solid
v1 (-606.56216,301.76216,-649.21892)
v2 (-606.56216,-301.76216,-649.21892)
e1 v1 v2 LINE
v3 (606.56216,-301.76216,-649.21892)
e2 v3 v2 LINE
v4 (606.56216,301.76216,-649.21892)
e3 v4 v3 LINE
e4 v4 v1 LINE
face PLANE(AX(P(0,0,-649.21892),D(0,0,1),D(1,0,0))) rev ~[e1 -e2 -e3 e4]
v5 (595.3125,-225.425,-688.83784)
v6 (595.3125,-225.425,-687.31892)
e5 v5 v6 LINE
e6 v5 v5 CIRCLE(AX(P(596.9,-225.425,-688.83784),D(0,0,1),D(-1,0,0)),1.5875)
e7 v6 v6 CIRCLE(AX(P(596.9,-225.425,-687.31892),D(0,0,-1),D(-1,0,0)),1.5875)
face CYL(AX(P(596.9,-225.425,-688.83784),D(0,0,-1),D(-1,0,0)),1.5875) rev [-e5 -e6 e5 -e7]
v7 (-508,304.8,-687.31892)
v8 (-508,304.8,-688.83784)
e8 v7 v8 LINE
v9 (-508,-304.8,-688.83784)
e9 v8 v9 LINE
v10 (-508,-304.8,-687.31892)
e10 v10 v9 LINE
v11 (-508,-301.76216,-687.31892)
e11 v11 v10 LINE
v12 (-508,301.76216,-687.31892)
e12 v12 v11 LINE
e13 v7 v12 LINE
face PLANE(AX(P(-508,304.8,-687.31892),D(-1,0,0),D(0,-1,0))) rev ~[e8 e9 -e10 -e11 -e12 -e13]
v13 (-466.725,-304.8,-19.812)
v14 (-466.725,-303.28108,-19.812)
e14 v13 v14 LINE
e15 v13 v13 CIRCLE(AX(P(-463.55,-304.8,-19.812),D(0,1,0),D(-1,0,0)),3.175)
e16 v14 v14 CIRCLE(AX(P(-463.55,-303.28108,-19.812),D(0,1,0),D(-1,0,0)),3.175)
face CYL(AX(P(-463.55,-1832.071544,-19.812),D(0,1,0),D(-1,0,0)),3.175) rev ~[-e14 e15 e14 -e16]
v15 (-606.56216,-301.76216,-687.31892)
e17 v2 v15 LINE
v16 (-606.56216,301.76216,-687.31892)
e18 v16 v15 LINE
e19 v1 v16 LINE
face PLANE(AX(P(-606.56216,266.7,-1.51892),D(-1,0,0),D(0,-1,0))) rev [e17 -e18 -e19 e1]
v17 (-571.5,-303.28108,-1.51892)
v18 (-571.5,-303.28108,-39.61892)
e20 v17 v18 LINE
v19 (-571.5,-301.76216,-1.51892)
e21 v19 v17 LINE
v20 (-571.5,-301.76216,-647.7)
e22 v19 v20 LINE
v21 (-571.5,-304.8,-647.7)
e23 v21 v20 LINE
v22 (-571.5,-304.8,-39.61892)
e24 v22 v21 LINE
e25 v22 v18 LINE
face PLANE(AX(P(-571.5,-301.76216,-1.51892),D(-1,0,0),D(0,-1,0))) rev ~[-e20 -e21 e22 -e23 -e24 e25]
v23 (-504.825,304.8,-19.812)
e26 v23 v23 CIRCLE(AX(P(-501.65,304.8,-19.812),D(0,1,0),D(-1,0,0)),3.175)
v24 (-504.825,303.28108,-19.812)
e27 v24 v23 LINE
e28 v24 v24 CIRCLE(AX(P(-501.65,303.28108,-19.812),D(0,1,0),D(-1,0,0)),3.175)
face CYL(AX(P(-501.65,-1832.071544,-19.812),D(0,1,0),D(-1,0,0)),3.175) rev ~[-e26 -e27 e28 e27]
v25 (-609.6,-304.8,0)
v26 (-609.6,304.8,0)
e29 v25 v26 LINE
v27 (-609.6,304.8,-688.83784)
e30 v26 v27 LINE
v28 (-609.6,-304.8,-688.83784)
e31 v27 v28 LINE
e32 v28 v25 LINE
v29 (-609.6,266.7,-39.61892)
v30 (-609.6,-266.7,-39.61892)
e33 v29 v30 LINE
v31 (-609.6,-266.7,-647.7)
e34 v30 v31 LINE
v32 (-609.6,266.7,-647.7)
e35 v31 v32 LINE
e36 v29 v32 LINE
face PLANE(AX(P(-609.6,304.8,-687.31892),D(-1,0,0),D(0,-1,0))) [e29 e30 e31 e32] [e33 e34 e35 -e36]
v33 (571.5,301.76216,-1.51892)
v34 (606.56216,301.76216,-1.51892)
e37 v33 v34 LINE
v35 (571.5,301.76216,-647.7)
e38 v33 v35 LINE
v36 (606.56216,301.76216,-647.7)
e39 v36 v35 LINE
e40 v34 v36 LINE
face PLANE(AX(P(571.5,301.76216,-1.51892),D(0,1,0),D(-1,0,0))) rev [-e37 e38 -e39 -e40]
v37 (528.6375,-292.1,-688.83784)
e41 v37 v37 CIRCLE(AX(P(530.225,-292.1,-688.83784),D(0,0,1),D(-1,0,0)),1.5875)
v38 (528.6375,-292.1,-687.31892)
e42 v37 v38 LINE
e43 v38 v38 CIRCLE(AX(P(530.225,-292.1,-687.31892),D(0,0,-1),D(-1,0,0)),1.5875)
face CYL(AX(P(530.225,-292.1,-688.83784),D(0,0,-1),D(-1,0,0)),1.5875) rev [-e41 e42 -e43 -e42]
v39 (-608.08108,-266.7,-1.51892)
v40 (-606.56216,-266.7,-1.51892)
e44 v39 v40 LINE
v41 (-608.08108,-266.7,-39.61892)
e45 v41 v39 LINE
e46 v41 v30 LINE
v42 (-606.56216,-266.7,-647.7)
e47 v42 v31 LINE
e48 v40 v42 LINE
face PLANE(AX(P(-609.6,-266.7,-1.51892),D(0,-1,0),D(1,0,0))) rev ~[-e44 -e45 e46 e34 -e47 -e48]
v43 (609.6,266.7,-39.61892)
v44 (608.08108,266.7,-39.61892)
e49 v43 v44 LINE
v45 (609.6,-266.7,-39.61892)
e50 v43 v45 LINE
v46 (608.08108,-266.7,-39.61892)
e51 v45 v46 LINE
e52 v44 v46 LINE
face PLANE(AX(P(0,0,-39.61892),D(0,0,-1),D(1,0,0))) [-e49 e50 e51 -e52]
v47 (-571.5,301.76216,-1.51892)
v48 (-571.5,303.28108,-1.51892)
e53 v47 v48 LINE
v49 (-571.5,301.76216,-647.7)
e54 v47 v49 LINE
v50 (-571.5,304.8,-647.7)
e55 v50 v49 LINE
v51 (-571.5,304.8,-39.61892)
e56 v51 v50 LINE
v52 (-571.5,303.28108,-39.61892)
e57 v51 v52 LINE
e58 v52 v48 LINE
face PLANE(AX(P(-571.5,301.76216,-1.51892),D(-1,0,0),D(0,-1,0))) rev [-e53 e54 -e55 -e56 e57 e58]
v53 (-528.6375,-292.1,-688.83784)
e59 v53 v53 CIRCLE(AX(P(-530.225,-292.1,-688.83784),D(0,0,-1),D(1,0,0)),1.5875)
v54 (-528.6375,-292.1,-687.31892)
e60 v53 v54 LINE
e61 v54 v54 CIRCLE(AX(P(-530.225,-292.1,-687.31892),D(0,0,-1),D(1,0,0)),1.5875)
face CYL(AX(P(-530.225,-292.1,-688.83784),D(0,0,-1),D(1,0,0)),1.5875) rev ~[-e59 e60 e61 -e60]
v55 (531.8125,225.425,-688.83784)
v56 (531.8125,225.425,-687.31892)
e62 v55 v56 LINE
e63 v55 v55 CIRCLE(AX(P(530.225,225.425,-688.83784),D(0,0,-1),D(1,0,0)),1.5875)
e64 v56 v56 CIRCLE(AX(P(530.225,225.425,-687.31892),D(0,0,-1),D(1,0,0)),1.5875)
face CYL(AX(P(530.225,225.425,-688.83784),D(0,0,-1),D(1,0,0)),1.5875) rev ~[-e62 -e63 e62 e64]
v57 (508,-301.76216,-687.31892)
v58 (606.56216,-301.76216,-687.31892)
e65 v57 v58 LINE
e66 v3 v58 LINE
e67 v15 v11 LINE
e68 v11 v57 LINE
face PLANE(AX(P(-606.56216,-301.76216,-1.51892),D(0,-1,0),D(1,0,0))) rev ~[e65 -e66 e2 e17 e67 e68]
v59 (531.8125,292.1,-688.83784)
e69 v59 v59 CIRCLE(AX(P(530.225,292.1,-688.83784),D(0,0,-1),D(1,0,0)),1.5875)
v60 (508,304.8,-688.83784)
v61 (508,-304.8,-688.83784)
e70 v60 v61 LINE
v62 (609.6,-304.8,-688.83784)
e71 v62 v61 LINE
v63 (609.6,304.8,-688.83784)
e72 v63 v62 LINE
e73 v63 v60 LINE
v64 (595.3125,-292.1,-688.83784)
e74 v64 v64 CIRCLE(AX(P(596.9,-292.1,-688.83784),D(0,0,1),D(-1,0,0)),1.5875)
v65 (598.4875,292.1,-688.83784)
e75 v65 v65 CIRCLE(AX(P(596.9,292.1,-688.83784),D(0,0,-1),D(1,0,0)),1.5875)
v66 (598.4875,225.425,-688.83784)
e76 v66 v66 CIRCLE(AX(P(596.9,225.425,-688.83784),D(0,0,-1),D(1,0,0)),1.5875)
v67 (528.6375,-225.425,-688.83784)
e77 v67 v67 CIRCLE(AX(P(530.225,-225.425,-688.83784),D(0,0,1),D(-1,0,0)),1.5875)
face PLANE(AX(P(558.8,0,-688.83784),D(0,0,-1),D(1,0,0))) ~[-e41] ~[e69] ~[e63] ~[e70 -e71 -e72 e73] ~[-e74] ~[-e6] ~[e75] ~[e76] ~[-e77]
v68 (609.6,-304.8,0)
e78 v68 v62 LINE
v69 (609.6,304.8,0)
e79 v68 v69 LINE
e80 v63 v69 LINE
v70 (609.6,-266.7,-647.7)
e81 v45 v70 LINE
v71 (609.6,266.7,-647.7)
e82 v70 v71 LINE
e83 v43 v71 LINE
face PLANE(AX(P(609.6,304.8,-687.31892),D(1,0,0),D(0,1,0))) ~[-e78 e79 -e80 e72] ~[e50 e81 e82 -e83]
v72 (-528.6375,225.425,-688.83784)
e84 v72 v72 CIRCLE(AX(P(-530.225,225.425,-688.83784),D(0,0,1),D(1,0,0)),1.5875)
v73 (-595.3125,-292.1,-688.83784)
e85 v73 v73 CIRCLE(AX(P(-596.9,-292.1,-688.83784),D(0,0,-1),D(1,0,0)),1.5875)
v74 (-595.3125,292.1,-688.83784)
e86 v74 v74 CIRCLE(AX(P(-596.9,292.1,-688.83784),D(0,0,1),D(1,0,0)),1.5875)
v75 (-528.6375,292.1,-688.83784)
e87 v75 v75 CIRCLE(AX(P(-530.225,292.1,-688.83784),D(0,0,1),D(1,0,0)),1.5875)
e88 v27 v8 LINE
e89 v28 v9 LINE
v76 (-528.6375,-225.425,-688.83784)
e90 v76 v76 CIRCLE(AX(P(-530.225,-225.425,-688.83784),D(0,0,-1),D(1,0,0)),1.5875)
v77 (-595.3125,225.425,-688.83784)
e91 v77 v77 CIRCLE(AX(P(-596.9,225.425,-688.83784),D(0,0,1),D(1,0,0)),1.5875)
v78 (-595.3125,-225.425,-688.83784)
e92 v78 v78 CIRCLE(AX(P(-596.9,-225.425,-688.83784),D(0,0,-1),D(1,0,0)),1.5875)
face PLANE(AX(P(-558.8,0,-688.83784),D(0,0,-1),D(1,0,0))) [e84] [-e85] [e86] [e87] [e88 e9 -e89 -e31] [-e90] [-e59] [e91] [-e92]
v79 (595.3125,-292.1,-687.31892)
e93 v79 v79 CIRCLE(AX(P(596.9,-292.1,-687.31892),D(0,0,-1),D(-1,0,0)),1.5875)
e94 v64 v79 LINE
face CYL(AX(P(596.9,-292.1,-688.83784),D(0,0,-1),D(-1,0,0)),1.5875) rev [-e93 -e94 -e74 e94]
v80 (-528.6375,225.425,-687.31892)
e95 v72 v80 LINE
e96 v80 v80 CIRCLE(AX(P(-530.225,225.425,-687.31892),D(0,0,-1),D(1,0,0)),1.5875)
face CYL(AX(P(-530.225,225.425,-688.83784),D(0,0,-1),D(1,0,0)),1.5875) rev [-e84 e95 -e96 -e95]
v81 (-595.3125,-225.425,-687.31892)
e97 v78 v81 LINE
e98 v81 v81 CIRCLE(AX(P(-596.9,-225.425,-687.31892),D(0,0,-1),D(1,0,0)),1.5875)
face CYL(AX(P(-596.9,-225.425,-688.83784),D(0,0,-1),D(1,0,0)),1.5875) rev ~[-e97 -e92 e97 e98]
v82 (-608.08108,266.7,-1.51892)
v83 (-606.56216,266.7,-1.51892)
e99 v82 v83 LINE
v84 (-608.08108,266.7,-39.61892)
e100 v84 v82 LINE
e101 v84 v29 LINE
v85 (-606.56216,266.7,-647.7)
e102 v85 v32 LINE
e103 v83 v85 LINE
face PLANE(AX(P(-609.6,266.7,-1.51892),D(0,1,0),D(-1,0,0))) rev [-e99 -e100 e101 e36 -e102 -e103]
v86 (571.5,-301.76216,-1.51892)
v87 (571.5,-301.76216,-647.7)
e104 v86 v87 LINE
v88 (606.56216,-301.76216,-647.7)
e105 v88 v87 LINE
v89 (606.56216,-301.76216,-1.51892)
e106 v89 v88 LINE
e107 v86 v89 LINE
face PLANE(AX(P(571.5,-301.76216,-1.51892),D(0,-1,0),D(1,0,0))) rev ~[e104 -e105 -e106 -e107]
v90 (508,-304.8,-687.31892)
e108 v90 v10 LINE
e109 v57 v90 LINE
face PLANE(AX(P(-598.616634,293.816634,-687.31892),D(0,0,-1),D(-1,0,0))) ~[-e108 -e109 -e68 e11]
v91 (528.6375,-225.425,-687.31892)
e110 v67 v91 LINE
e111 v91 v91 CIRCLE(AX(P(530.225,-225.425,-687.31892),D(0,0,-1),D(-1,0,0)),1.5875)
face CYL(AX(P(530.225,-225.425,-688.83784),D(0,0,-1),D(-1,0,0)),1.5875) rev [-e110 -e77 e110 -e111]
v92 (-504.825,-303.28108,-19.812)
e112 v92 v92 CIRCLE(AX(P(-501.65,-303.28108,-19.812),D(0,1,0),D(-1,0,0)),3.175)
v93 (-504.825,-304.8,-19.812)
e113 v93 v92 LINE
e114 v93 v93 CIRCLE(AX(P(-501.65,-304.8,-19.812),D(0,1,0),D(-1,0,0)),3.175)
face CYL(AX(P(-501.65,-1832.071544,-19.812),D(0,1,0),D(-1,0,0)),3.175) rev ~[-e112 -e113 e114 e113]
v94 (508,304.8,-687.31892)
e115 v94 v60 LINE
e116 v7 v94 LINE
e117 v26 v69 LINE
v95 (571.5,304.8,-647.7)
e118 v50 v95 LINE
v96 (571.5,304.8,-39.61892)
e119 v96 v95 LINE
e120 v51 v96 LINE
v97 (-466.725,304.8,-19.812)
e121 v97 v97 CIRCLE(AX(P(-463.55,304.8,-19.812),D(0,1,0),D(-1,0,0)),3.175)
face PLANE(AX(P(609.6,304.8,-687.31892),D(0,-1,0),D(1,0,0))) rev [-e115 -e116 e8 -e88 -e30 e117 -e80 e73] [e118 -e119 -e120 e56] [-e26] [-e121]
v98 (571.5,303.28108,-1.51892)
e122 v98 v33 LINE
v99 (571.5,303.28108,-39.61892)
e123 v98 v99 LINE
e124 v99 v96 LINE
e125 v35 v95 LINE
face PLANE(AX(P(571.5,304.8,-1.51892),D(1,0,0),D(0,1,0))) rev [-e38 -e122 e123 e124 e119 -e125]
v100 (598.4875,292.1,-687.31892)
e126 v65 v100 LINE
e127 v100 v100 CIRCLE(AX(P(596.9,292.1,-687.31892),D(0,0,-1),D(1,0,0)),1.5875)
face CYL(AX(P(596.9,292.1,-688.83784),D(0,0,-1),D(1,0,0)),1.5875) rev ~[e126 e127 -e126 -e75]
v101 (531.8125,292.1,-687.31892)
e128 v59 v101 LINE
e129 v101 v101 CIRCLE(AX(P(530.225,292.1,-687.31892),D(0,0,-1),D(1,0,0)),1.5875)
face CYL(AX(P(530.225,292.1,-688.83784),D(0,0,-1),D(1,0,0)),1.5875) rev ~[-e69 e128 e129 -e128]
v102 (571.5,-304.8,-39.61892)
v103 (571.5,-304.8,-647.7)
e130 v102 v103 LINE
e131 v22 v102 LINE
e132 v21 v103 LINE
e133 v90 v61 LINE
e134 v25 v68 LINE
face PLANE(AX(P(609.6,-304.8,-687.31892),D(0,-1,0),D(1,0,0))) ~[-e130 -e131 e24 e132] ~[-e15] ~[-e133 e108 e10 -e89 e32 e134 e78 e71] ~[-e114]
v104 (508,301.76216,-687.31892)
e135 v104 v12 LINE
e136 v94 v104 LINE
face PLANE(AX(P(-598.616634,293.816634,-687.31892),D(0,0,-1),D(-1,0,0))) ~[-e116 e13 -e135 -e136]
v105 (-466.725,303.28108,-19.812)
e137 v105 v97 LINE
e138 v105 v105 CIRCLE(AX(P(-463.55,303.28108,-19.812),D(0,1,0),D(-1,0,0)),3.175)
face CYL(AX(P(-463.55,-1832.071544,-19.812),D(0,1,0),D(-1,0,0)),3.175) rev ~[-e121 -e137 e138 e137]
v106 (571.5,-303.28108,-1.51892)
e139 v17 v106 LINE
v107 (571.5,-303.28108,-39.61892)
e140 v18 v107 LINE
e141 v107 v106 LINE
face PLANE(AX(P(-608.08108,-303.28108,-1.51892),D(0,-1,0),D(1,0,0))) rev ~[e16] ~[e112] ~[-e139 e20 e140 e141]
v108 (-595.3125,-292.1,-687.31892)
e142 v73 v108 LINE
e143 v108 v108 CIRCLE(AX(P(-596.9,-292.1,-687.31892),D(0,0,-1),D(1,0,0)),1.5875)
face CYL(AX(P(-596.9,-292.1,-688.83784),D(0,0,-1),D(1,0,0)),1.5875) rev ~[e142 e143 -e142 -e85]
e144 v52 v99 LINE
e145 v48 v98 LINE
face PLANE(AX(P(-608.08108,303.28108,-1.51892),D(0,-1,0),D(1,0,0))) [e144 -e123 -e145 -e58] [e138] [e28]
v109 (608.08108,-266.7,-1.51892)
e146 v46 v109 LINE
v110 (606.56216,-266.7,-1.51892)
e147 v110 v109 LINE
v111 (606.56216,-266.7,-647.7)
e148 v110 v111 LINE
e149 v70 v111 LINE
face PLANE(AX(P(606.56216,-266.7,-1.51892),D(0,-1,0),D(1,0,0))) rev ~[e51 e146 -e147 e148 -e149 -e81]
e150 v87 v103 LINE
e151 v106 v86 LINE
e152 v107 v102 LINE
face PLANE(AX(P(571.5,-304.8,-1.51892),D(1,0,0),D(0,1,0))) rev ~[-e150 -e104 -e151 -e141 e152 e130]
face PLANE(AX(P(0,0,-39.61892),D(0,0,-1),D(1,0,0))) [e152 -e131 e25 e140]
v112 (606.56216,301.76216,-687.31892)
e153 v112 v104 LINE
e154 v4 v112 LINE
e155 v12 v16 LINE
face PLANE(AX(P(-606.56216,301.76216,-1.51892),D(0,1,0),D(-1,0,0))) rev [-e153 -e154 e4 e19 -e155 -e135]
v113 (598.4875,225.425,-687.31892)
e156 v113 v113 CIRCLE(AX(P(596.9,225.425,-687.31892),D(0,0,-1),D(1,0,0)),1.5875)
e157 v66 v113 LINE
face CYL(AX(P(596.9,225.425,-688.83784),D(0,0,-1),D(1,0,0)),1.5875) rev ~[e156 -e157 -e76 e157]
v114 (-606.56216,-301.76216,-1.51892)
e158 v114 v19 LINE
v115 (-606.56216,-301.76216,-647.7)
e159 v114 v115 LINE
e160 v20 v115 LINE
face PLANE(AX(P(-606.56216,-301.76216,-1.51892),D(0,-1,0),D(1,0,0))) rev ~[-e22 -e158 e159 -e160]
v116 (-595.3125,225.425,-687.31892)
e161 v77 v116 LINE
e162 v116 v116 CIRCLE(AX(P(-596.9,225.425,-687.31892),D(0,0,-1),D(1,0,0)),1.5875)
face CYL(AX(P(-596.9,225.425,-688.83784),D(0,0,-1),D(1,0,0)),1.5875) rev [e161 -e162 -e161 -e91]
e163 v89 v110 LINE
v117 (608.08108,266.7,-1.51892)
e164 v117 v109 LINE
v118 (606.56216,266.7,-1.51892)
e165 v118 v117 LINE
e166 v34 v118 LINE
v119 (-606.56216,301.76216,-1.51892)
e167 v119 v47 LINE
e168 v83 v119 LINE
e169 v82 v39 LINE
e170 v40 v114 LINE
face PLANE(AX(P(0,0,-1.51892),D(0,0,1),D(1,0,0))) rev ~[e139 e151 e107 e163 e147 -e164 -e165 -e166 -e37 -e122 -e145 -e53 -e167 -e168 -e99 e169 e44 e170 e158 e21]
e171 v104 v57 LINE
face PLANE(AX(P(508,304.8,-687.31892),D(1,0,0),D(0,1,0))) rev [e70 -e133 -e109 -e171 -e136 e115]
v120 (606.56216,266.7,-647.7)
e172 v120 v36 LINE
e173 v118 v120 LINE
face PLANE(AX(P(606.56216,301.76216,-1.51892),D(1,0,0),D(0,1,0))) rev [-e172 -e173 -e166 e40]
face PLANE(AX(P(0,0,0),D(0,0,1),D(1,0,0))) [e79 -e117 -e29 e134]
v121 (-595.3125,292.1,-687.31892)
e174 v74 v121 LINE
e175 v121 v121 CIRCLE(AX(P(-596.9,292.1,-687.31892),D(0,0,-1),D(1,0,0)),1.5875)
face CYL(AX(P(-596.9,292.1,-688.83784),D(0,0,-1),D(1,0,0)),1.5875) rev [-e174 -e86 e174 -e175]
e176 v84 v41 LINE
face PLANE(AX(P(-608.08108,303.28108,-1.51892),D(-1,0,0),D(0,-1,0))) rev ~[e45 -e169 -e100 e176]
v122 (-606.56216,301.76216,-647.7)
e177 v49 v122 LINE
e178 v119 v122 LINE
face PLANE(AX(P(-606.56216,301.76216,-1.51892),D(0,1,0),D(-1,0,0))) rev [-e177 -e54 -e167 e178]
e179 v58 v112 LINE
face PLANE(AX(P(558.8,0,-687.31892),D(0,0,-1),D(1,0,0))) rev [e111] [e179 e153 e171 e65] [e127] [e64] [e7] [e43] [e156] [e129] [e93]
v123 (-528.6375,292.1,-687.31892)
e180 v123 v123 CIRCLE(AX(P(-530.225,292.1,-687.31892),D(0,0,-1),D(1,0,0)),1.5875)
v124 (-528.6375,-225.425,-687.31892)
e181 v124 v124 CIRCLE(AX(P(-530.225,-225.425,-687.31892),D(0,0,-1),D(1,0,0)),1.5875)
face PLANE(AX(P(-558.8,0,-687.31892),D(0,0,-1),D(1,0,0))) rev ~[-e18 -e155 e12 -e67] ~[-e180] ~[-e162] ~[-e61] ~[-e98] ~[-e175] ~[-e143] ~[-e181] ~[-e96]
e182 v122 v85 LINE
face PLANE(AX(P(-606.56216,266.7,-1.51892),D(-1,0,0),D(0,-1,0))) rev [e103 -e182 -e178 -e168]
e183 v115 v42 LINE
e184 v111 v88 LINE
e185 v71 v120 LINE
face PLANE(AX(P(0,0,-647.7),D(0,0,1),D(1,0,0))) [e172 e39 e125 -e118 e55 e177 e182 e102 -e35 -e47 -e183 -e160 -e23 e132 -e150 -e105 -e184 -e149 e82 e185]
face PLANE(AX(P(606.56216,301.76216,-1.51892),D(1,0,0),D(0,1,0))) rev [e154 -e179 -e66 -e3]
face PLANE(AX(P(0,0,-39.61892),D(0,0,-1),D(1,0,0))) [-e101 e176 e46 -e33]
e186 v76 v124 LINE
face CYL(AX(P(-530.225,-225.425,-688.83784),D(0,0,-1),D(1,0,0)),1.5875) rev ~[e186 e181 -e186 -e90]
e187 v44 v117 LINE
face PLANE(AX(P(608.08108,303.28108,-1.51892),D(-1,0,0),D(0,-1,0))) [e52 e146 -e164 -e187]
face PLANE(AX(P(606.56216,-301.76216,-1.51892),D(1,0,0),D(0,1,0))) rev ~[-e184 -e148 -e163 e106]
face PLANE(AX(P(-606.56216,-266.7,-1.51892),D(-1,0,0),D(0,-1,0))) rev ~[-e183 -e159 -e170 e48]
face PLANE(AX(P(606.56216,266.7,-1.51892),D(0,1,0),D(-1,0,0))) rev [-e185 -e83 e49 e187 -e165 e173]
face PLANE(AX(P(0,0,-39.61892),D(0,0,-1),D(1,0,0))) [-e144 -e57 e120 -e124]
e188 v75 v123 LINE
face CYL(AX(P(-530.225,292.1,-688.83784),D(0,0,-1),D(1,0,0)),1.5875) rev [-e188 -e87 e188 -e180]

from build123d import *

# Parameters (mm, degrees)
F0_W              = 1219.2
F0_H              = 609.6
F1_DEPTH          = 1.51892
F2_W              = 1219.2
F2_H              = 609.6
F2_W_2            = 1216.16216
F2_H_2            = 606.56216
F3_DEPTH          = 38.1
F5_DEPTH          = 685.8
F7_W              = 1219.2
F7_H              = 609.6
F8_DEPTH          = 1.51892
F9_W              = 1219.2
F9_H              = 609.6
F9_W_2            = 1213.12432
F9_H_2            = 603.52432
F10_DEPTH         = 38.1
F11_W             = 101.6
F11_H             = 609.6
F12_DEPTH         = 1.51892
F13_R             = 1.5875
F14_DEPTH         = 1.651
F14_COPIES2_COUNT = 2
F14_COPIES2_PITCH = 1240.259203
F16_D             = 6.35


# Not quite as in the source:
# - a pattern or mirror of a feature is missing from the dataset's text; its kind, count and spacing are read off the source's solid


with BuildPart() as f1:
    # F0 (on Top) → F1 (new body)
    with BuildSketch(Plane.XY):
        Rectangle(F0_W, F0_H)
    extrude(amount=-F1_DEPTH)

    # F2 (on face) → F3 (join)
    with BuildSketch(Plane(origin=(0, 0, -1.51892), x_dir=(1, 0, 0), z_dir=(0, 0, -1))):
        Rectangle(F2_W, F2_H)
        Rectangle(F2_W_2, F2_H_2, mode=Mode.SUBTRACT)
    extrude(amount=F3_DEPTH)

    # F4 (on face) → F5 (join)
    with BuildSketch(Plane(origin=(0, 0, -1.51892), x_dir=(1, 0, 0), z_dir=(0, 0, -1))):
        Polygon((-571.5, 301.76216), (-571.5, 304.8), (-609.6, 304.8), (-609.6, 266.7), (-606.56216, 266.7), (-606.56216, 301.76216), align=None)
        Polygon((571.5, 304.8), (571.5, 301.76216), (606.56216, 301.76216), (606.56216, 266.7), (609.6, 266.7), (609.6, 304.8), align=None)
    f5 = extrude(amount=F5_DEPTH)

    # F5_copies: F5 across plane
    add(f5.mirror(Plane.ZX))

    # F7 (on offset) → F8 (join)
    with BuildSketch(Plane.XY.offset(-647.7)):
        Rectangle(F7_W, F7_H)
    extrude(amount=-F8_DEPTH)

    # F9 (on face) → F10 (join)
    with BuildSketch(Plane(origin=(0, 0, -649.21892), x_dir=(1, 0, 0), z_dir=(0, 0, -1))):
        Rectangle(F9_W, F9_H)
        Rectangle(F9_W_2, F9_H_2, mode=Mode.SUBTRACT)
    extrude(amount=F10_DEPTH)

    # F11 (on face) → F12 (join)
    with BuildSketch(Plane(origin=(0, 0, -687.31892), x_dir=(1, 0, 0), z_dir=(0, 0, -1))):
        with Locations((-558.8, 0)):
            Rectangle(F11_W, F11_H)
    f12 = extrude(amount=F12_DEPTH)

    # F12_copies: F12 across plane
    add(f12.mirror(Plane(origin=(0, 0, 0), x_dir=(0, 0, 1), z_dir=(1, 0, 0))))

    # F13 (on face) → F14 (cut)
    with BuildSketch(Plane(origin=(0, 0, -688.83784), x_dir=(1, 0, 0), z_dir=(0, 0, -1))):
        with Locations((-596.9, 292.1)):
            Circle(F13_R)
        with Locations((-596.9, 225.425)):
            Circle(F13_R)
        with Locations((-530.225, 292.1)):
            Circle(F13_R)
        with Locations((-530.225, 225.425)):
            Circle(F13_R)
    f14 = extrude(amount=-F14_DEPTH, mode=Mode.SUBTRACT)

    # F14_copies: F14 across plane
    add(f14.mirror(Plane(origin=(0, 0, 0), x_dir=(0, 0, 1), z_dir=(1, 0, 0))), mode=Mode.SUBTRACT)

    # F14_copies1: F14 across plane
    add(f14.mirror(Plane.ZX), mode=Mode.SUBTRACT)

    # F14_copies2: F14 ×2
    with Locations(*[Vector(0.9087818071, 0.4172716466, 0) * (i * F14_COPIES2_PITCH) for i in range(1, F14_COPIES2_COUNT)]):
        add(f14, mode=Mode.SUBTRACT)

    # F16 (through all)
    with Locations(Plane.XZ.offset(304.8)):
        with Locations((-501.65, -19.812), (-463.55, -19.812)):
            Hole(F16_D / 2)


solid = f1.part
